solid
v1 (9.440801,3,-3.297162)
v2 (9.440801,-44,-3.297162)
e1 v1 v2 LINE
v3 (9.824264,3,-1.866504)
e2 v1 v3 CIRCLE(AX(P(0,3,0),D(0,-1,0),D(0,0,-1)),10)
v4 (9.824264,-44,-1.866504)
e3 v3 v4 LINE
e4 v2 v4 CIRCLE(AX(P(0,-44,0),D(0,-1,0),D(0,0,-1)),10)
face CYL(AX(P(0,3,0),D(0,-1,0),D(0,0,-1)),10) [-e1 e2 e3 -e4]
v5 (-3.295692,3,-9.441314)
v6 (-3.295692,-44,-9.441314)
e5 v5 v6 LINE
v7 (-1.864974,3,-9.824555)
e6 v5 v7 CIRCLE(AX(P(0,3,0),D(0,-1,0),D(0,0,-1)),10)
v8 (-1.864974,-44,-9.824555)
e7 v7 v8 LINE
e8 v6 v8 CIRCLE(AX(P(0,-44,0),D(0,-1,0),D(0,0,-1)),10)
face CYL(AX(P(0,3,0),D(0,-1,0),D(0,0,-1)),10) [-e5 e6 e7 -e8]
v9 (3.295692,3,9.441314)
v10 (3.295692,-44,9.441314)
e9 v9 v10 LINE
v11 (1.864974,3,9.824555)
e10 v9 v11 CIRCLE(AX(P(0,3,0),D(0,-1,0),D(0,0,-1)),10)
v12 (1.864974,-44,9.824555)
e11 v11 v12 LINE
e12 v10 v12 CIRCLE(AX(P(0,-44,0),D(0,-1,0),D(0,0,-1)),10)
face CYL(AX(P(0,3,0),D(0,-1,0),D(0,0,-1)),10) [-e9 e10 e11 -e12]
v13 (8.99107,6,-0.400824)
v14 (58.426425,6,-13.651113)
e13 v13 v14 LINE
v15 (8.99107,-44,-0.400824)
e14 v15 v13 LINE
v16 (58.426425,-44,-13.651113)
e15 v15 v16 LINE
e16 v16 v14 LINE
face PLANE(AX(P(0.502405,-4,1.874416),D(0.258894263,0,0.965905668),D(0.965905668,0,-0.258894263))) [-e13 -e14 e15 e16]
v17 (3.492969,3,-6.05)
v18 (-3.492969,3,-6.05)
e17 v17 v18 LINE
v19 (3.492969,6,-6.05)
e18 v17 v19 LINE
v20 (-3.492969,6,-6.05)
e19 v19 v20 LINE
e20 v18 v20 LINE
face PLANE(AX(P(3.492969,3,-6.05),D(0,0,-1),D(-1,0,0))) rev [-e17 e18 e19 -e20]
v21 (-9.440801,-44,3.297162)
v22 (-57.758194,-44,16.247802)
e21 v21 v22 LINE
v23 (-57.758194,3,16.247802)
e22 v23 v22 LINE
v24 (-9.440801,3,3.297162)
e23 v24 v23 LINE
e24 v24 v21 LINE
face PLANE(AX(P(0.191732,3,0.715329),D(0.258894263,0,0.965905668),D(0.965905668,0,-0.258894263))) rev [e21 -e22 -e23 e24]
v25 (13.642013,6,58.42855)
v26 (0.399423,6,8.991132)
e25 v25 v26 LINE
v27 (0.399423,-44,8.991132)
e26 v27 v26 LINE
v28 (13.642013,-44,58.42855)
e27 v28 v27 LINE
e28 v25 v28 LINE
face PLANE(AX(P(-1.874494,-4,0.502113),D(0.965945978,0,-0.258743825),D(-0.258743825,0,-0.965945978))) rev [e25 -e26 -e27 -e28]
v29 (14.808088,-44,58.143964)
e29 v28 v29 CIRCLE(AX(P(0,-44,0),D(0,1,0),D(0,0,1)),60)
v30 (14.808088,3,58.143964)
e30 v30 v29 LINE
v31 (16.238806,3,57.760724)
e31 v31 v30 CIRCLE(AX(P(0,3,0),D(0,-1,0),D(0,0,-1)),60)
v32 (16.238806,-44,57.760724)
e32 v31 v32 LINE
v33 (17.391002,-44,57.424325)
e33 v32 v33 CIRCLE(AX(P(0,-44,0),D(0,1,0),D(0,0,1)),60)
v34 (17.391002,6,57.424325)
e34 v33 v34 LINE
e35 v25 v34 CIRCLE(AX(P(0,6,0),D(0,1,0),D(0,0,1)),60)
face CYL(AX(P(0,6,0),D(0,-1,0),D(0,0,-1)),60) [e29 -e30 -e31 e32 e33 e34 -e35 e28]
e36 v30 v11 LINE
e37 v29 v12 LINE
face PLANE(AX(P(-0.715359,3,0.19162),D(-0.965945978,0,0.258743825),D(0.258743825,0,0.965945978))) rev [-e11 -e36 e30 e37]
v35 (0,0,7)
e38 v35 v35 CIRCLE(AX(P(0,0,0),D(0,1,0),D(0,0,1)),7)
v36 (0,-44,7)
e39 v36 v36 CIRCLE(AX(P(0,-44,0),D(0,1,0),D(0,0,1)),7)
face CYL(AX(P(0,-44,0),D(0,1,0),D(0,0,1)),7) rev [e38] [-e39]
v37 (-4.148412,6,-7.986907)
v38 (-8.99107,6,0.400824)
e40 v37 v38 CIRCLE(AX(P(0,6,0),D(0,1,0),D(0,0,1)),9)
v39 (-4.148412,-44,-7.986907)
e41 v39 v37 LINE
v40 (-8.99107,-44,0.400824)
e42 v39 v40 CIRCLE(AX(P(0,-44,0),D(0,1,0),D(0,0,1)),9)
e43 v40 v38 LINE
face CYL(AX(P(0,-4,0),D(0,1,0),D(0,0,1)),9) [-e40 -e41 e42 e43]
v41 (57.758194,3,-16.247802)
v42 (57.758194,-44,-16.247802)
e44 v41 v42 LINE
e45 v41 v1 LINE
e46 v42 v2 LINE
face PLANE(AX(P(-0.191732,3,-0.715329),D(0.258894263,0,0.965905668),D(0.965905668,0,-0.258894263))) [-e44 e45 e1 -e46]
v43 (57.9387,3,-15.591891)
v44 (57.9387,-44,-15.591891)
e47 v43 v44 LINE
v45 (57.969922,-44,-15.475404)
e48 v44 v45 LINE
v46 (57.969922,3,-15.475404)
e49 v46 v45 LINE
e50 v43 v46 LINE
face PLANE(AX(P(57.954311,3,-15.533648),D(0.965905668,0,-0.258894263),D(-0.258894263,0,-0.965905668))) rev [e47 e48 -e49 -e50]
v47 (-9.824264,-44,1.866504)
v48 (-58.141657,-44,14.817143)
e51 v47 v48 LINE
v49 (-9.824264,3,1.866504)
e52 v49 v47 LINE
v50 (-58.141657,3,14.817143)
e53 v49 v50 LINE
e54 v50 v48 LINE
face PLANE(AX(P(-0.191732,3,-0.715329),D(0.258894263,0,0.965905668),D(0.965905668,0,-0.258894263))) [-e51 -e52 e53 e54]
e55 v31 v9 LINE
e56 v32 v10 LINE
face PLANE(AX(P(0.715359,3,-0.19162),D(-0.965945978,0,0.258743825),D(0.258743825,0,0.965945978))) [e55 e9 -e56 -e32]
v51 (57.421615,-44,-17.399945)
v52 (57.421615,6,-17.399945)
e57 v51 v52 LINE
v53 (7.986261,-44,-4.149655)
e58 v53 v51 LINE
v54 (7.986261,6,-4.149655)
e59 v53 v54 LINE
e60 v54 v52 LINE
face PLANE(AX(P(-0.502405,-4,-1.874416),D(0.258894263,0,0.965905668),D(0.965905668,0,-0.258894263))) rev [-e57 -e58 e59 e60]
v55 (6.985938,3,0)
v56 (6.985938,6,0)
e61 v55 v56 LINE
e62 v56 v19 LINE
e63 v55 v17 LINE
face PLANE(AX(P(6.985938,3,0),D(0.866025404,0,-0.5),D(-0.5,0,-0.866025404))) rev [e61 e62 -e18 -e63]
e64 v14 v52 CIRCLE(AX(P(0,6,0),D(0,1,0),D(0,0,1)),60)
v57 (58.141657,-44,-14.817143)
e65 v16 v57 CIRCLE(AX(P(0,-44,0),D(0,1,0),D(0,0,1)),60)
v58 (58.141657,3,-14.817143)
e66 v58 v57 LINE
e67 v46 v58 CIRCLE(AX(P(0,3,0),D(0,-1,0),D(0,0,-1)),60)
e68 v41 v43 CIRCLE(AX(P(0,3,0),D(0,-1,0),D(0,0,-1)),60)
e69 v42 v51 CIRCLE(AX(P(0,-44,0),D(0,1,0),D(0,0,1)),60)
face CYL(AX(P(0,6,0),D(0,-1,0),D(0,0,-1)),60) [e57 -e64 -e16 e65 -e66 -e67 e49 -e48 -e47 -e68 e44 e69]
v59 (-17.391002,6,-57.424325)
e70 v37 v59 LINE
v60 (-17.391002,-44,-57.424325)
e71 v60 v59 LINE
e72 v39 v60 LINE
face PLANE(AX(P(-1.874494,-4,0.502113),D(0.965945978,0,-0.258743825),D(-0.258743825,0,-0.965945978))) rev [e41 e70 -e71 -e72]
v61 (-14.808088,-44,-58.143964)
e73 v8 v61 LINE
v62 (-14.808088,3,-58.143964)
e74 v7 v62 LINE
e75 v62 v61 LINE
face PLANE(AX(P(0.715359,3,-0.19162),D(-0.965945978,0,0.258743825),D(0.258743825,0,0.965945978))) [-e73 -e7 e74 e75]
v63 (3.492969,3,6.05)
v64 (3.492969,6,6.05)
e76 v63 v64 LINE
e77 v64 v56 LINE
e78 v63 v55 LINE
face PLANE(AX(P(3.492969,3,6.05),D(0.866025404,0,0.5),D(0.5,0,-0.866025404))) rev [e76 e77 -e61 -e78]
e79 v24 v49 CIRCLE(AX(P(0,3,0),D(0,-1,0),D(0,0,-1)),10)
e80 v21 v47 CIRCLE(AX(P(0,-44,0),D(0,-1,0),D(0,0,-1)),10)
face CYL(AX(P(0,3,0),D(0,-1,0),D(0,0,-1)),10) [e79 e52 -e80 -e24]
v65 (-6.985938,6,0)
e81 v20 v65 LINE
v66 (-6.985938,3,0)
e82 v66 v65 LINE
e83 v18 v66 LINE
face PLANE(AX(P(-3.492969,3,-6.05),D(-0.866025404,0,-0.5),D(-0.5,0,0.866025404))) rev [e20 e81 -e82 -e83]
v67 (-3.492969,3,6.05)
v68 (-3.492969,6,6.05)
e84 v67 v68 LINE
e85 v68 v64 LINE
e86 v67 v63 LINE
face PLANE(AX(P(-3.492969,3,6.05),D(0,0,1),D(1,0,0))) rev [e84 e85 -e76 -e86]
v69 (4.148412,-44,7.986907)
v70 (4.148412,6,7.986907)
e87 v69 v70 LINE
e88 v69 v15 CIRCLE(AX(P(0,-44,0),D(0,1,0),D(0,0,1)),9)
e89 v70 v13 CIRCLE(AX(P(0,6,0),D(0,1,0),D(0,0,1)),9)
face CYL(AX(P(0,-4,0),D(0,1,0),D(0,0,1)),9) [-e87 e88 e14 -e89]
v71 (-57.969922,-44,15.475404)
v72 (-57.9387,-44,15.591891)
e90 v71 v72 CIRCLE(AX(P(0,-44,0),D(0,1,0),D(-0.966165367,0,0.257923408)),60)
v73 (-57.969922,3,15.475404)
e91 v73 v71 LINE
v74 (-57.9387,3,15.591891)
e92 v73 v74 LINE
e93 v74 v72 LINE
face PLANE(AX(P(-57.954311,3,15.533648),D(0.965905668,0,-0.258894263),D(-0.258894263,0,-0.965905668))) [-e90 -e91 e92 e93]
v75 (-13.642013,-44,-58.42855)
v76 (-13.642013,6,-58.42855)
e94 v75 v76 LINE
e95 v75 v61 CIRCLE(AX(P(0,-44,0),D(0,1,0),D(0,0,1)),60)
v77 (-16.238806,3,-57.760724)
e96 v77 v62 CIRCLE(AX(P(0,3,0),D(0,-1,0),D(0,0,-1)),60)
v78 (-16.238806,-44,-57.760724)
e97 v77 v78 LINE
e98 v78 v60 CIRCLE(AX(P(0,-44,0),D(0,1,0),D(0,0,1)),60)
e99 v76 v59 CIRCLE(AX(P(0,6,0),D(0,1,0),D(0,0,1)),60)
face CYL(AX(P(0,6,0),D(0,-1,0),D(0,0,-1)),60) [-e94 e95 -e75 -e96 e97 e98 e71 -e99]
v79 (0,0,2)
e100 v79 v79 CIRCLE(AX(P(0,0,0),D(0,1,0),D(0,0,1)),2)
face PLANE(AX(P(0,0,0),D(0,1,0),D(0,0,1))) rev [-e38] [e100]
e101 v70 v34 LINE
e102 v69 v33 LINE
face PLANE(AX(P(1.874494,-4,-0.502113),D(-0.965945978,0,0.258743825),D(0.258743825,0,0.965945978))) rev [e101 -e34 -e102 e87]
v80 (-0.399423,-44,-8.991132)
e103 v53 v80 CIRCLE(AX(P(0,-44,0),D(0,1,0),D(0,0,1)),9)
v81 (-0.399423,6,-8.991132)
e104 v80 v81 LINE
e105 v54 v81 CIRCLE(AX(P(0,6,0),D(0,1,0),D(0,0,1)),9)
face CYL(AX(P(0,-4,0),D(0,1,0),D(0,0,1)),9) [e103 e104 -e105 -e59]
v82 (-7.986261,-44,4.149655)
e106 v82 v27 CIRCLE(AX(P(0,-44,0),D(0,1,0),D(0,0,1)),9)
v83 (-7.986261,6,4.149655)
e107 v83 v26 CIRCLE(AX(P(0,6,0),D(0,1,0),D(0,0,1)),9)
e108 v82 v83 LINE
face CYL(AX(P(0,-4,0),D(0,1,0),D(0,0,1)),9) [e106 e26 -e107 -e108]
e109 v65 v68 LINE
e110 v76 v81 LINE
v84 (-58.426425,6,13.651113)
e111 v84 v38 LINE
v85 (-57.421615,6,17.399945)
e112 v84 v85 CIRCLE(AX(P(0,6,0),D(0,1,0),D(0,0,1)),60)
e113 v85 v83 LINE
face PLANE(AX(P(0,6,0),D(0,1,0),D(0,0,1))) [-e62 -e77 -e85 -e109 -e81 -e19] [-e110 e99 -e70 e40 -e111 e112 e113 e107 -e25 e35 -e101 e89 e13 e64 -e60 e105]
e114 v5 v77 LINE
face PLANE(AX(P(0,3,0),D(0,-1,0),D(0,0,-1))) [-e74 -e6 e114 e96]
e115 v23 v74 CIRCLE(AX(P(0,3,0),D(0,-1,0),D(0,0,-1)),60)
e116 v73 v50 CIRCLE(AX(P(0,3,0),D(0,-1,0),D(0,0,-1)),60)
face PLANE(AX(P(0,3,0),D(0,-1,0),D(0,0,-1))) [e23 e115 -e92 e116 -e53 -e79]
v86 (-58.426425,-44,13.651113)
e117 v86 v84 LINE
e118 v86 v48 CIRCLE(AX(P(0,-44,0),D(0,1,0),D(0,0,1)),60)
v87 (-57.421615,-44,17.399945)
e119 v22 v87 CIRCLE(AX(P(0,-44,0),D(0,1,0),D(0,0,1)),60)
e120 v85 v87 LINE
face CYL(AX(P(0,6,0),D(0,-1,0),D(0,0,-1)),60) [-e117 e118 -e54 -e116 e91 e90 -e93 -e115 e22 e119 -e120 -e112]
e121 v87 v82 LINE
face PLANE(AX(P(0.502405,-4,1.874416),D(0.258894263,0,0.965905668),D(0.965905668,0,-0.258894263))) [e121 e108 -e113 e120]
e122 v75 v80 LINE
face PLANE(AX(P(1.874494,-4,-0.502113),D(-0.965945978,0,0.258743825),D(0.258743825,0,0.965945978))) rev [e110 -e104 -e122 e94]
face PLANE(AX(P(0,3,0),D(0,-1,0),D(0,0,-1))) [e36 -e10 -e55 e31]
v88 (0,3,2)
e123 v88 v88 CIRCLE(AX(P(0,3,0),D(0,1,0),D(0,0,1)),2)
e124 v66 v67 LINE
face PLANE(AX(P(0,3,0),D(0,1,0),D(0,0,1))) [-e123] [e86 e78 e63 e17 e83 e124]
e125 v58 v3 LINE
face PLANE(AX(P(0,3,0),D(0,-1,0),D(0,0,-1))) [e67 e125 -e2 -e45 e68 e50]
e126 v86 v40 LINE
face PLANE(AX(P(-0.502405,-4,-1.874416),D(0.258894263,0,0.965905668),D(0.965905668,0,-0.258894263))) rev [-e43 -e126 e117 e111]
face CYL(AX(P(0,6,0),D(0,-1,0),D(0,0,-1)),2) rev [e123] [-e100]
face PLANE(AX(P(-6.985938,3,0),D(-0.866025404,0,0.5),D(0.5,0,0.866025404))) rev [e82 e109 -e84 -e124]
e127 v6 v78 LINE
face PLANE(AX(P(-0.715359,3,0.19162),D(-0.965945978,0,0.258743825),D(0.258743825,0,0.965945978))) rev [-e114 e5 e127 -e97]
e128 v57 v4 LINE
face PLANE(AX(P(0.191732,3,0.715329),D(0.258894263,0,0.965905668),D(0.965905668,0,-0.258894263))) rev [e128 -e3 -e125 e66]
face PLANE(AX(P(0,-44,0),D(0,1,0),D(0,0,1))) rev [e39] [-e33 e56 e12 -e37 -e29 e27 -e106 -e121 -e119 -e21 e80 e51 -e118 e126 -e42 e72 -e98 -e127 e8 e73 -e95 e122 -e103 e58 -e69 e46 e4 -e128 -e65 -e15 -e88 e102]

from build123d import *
from build123d.topology import SkipClean

# Parameters (mm, degrees)
SKETCH_1_R          = 60
SKETCH_1_R_2        = 2
EXTRUDE_1_DEPTH     = 6
CUT_EXTRUDE_1_DEPTH = 3
CUT_EXTRUDE_START   = -6
CUT_EXTRUDE_2_DEPTH = 6
EXTRUDE_START       = -50
EXTRUDE_2_DEPTH     = 50
SKETCH_4_4_R        = 9
SKETCH_4_4_R_2      = 7
EXTRUDE_3_DEPTH     = 50
CUT_EXTRUDE_4_DEPTH = 47


# Read off the part's stored shape, not the designer's step: 切除-拉伸2
with BuildPart() as part:
    # 草图1 → 凸台-拉伸1 (new body)
    with BuildSketch(Plane(origin=(0, 0, 0), x_dir=(1, 0, 0), z_dir=(0, 1, 0))):
        with Locations(Location((0, 0, 0), (0, 0, 270))):
            Circle(SKETCH_1_R)
        with Locations(Location((0, 0, 0), (0, 0, 270))):
            Circle(SKETCH_1_R_2, mode=Mode.SUBTRACT)
    extrude(amount=EXTRUDE_1_DEPTH)

    # 草图2 → 切除-拉伸1 (cut)
    with BuildSketch(Plane(origin=(0, 6, 0), x_dir=(1, 0, 0), z_dir=(0, 1, 0))):
        Polygon((-3.492969129, -6.05), (3.492969129, -6.05), (6.985938257, 0), (3.492969129, 6.05), (-3.492969129, 6.05), (-6.985938257, 0), align=None)
    extrude(amount=-CUT_EXTRUDE_1_DEPTH, mode=Mode.SUBTRACT)

    # 切除-拉伸2 outline → 切除-拉伸2 (cut)
    with BuildSketch(Plane(origin=(0, 6, 0), x_dir=(1, 0, 0), z_dir=(0, 1, 0)).offset(CUT_EXTRUDE_START)):
        with BuildLine():
            ThreePointArc((-0.399423258, 8.991132357), (4.5, 7.794228634), (7.986260659, 4.14965549))
            Line((7.986260659, 4.14965549), (57.42161539, 17.399944999))
            ThreePointArc((57.42161539, 17.399944999), (30, 51.961524227), (-13.642013302, 58.428550154))
            Line((-13.642013302, 58.428550154), (-0.399423258, 8.991132357))
        make_face()
        with BuildLine():
            ThreePointArc((17.391001663, -57.424324647), (51.961524227, -30), (58.426424771, 13.651113086))
            Line((58.426424771, 13.651113086), (8.99107004, 0.400823577))
            ThreePointArc((8.99107004, 0.400823577), (7.794228634, -4.5), (4.14841162, -7.98690685))
            Line((4.14841162, -7.98690685), (17.391001663, -57.424324647))
        make_face()
        with BuildLine():
            Line((-4.14841162, 7.98690685), (-17.391001663, 57.424324647))
            ThreePointArc((-17.391001663, 57.424324647), (-51.961524227, 30), (-58.426424771, -13.651113086))
            Line((-58.426424771, -13.651113086), (-8.99107004, -0.400823577))
            ThreePointArc((-8.99107004, -0.400823577), (-7.794228634, 4.5), (-4.14841162, 7.98690685))
        make_face()
        with BuildLine():
            Line((-7.986260659, -4.14965549), (-57.42161539, -17.399944999))
            ThreePointArc((-57.42161539, -17.399944999), (-30, -51.961524227), (13.642013302, -58.428550154))
            Line((13.642013302, -58.428550154), (0.399423258, -8.991132357))
            ThreePointArc((0.399423258, -8.991132357), (-4.5, -7.794228634), (-7.986260659, -4.14965549))
        make_face()
    extrude(amount=CUT_EXTRUDE_2_DEPTH, mode=Mode.SUBTRACT)

    # 草图4<3> → 凸台-拉伸2 (add)
    with BuildSketch(Plane(origin=(0, 6, 0), x_dir=(1, 0, 0), z_dir=(0, 1, 0)).offset(EXTRUDE_START)):
        with BuildLine():
            Line((8.99107004, 0.400823577), (58.426424771, 13.651113086))
            ThreePointArc((58.426424771, 13.651113086), (57.954340109, 15.5336558), (57.42161539, 17.399944999))
            Line((57.42161539, 17.399944999), (7.986260659, 4.14965549))
            ThreePointArc((7.986260659, 4.14965549), (8.693151016, 2.33004837), (8.99107004, 0.400823577))
        make_face()
        with BuildLine():
            Line((17.391001663, -57.424324647), (4.14841162, -7.98690685))
            ThreePointArc((4.14841162, -7.98690685), (2.328694427, -8.693513804), (0.399423258, -8.991132357))
            Line((0.399423258, -8.991132357), (13.642013302, -58.428550154))
            ThreePointArc((13.642013302, -58.428550154), (15.524629518, -57.956758694), (17.391001663, -57.424324647))
        make_face()
        with BuildLine():
            Line((-0.399423258, 8.991132357), (-13.642013302, 58.428550154))
            ThreePointArc((-13.642013302, 58.428550154), (-15.524629518, 57.956758694), (-17.391001663, 57.424324647))
            Line((-17.391001663, 57.424324647), (-4.14841162, 7.98690685))
            ThreePointArc((-4.14841162, 7.98690685), (-2.328694427, 8.693513804), (-0.399423258, 8.991132357))
        make_face()
        with BuildLine():
            Line((-57.42161539, -17.399944999), (-7.986260659, -4.14965549))
            ThreePointArc((-7.986260659, -4.14965549), (-8.693151016, -2.33004837), (-8.99107004, -0.400823577))
            Line((-8.99107004, -0.400823577), (-58.426424771, -13.651113086))
            ThreePointArc((-58.426424771, -13.651113086), (-57.954340109, -15.5336558), (-57.42161539, -17.399944999))
        make_face()
    extrude(amount=EXTRUDE_2_DEPTH)

    # 草图4<4> → 凸台-拉伸3 (add)
    with SkipClean():  # the faces are left unmerged after this step: merging them gives an invalid solid
        with BuildSketch(Plane(origin=(0, 6, 0), x_dir=(1, 0, 0), z_dir=(0, 1, 0)).offset(EXTRUDE_START)):
            Circle(SKETCH_4_4_R)
            with Locations(Location((0, 0, 0), (0, 0, 270))):
                Circle(SKETCH_4_4_R_2, mode=Mode.SUBTRACT)
        extrude(amount=EXTRUDE_3_DEPTH)
    add(part.part.scale(1), mode=Mode.REPLACE)  # the faces are merged on a copy

    # 草图5 → 切除-拉伸4 (cut)
    with SkipClean():  # the faces are left unmerged after this step: merging them gives an invalid solid
        with BuildSketch(Plane.XZ.offset(44)):
            with BuildLine():
                Line((3.295692014, 9.441314217), (16.239993631, 57.765157595))
                Line((16.239993631, 57.765157595), (14.809275617, 58.148397921))
                Line((14.809275617, 58.148397921), (1.864974, 9.824554544))
                ThreePointArc((1.864974, 9.824554544), (2.587438253, 9.659459782), (3.295692014, 9.441314217))
            make_face()
            with BuildLine():
                Line((58.146042416, -14.818318801), (9.824263964, -1.866504102))
                ThreePointArc((9.824263964, -1.866504102), (9.659056685, -2.588942633), (9.440800816, -3.29716241))
                Line((9.440800816, -3.29716241), (57.762579268, -16.24897711))
                Line((57.762579268, -16.24897711), (58.146042416, -14.818318801))
            make_face()
            with BuildLine():
                ThreePointArc((-9.824263964, 1.866504102), (-9.659056685, 2.588942633), (-9.440800816, 3.29716241))
                Line((-9.440800816, 3.29716241), (-57.762579268, 16.24897711))
                Line((-57.762579268, 16.24897711), (-58.146042416, 14.818318801))
                Line((-58.146042416, 14.818318801), (-9.824263964, 1.866504102))
            make_face()
            with BuildLine():
                Line((-14.809275617, -58.148397921), (-1.864974, -9.824554544))
                ThreePointArc((-1.864974, -9.824554544), (-2.587438253, -9.659459782), (-3.295692014, -9.441314217))
                Line((-3.295692014, -9.441314217), (-16.239993631, -57.765157595))
                Line((-16.239993631, -57.765157595), (-14.809275617, -58.148397921))
            make_face()
        extrude(amount=-CUT_EXTRUDE_4_DEPTH, mode=Mode.SUBTRACT)


solid = part.part
